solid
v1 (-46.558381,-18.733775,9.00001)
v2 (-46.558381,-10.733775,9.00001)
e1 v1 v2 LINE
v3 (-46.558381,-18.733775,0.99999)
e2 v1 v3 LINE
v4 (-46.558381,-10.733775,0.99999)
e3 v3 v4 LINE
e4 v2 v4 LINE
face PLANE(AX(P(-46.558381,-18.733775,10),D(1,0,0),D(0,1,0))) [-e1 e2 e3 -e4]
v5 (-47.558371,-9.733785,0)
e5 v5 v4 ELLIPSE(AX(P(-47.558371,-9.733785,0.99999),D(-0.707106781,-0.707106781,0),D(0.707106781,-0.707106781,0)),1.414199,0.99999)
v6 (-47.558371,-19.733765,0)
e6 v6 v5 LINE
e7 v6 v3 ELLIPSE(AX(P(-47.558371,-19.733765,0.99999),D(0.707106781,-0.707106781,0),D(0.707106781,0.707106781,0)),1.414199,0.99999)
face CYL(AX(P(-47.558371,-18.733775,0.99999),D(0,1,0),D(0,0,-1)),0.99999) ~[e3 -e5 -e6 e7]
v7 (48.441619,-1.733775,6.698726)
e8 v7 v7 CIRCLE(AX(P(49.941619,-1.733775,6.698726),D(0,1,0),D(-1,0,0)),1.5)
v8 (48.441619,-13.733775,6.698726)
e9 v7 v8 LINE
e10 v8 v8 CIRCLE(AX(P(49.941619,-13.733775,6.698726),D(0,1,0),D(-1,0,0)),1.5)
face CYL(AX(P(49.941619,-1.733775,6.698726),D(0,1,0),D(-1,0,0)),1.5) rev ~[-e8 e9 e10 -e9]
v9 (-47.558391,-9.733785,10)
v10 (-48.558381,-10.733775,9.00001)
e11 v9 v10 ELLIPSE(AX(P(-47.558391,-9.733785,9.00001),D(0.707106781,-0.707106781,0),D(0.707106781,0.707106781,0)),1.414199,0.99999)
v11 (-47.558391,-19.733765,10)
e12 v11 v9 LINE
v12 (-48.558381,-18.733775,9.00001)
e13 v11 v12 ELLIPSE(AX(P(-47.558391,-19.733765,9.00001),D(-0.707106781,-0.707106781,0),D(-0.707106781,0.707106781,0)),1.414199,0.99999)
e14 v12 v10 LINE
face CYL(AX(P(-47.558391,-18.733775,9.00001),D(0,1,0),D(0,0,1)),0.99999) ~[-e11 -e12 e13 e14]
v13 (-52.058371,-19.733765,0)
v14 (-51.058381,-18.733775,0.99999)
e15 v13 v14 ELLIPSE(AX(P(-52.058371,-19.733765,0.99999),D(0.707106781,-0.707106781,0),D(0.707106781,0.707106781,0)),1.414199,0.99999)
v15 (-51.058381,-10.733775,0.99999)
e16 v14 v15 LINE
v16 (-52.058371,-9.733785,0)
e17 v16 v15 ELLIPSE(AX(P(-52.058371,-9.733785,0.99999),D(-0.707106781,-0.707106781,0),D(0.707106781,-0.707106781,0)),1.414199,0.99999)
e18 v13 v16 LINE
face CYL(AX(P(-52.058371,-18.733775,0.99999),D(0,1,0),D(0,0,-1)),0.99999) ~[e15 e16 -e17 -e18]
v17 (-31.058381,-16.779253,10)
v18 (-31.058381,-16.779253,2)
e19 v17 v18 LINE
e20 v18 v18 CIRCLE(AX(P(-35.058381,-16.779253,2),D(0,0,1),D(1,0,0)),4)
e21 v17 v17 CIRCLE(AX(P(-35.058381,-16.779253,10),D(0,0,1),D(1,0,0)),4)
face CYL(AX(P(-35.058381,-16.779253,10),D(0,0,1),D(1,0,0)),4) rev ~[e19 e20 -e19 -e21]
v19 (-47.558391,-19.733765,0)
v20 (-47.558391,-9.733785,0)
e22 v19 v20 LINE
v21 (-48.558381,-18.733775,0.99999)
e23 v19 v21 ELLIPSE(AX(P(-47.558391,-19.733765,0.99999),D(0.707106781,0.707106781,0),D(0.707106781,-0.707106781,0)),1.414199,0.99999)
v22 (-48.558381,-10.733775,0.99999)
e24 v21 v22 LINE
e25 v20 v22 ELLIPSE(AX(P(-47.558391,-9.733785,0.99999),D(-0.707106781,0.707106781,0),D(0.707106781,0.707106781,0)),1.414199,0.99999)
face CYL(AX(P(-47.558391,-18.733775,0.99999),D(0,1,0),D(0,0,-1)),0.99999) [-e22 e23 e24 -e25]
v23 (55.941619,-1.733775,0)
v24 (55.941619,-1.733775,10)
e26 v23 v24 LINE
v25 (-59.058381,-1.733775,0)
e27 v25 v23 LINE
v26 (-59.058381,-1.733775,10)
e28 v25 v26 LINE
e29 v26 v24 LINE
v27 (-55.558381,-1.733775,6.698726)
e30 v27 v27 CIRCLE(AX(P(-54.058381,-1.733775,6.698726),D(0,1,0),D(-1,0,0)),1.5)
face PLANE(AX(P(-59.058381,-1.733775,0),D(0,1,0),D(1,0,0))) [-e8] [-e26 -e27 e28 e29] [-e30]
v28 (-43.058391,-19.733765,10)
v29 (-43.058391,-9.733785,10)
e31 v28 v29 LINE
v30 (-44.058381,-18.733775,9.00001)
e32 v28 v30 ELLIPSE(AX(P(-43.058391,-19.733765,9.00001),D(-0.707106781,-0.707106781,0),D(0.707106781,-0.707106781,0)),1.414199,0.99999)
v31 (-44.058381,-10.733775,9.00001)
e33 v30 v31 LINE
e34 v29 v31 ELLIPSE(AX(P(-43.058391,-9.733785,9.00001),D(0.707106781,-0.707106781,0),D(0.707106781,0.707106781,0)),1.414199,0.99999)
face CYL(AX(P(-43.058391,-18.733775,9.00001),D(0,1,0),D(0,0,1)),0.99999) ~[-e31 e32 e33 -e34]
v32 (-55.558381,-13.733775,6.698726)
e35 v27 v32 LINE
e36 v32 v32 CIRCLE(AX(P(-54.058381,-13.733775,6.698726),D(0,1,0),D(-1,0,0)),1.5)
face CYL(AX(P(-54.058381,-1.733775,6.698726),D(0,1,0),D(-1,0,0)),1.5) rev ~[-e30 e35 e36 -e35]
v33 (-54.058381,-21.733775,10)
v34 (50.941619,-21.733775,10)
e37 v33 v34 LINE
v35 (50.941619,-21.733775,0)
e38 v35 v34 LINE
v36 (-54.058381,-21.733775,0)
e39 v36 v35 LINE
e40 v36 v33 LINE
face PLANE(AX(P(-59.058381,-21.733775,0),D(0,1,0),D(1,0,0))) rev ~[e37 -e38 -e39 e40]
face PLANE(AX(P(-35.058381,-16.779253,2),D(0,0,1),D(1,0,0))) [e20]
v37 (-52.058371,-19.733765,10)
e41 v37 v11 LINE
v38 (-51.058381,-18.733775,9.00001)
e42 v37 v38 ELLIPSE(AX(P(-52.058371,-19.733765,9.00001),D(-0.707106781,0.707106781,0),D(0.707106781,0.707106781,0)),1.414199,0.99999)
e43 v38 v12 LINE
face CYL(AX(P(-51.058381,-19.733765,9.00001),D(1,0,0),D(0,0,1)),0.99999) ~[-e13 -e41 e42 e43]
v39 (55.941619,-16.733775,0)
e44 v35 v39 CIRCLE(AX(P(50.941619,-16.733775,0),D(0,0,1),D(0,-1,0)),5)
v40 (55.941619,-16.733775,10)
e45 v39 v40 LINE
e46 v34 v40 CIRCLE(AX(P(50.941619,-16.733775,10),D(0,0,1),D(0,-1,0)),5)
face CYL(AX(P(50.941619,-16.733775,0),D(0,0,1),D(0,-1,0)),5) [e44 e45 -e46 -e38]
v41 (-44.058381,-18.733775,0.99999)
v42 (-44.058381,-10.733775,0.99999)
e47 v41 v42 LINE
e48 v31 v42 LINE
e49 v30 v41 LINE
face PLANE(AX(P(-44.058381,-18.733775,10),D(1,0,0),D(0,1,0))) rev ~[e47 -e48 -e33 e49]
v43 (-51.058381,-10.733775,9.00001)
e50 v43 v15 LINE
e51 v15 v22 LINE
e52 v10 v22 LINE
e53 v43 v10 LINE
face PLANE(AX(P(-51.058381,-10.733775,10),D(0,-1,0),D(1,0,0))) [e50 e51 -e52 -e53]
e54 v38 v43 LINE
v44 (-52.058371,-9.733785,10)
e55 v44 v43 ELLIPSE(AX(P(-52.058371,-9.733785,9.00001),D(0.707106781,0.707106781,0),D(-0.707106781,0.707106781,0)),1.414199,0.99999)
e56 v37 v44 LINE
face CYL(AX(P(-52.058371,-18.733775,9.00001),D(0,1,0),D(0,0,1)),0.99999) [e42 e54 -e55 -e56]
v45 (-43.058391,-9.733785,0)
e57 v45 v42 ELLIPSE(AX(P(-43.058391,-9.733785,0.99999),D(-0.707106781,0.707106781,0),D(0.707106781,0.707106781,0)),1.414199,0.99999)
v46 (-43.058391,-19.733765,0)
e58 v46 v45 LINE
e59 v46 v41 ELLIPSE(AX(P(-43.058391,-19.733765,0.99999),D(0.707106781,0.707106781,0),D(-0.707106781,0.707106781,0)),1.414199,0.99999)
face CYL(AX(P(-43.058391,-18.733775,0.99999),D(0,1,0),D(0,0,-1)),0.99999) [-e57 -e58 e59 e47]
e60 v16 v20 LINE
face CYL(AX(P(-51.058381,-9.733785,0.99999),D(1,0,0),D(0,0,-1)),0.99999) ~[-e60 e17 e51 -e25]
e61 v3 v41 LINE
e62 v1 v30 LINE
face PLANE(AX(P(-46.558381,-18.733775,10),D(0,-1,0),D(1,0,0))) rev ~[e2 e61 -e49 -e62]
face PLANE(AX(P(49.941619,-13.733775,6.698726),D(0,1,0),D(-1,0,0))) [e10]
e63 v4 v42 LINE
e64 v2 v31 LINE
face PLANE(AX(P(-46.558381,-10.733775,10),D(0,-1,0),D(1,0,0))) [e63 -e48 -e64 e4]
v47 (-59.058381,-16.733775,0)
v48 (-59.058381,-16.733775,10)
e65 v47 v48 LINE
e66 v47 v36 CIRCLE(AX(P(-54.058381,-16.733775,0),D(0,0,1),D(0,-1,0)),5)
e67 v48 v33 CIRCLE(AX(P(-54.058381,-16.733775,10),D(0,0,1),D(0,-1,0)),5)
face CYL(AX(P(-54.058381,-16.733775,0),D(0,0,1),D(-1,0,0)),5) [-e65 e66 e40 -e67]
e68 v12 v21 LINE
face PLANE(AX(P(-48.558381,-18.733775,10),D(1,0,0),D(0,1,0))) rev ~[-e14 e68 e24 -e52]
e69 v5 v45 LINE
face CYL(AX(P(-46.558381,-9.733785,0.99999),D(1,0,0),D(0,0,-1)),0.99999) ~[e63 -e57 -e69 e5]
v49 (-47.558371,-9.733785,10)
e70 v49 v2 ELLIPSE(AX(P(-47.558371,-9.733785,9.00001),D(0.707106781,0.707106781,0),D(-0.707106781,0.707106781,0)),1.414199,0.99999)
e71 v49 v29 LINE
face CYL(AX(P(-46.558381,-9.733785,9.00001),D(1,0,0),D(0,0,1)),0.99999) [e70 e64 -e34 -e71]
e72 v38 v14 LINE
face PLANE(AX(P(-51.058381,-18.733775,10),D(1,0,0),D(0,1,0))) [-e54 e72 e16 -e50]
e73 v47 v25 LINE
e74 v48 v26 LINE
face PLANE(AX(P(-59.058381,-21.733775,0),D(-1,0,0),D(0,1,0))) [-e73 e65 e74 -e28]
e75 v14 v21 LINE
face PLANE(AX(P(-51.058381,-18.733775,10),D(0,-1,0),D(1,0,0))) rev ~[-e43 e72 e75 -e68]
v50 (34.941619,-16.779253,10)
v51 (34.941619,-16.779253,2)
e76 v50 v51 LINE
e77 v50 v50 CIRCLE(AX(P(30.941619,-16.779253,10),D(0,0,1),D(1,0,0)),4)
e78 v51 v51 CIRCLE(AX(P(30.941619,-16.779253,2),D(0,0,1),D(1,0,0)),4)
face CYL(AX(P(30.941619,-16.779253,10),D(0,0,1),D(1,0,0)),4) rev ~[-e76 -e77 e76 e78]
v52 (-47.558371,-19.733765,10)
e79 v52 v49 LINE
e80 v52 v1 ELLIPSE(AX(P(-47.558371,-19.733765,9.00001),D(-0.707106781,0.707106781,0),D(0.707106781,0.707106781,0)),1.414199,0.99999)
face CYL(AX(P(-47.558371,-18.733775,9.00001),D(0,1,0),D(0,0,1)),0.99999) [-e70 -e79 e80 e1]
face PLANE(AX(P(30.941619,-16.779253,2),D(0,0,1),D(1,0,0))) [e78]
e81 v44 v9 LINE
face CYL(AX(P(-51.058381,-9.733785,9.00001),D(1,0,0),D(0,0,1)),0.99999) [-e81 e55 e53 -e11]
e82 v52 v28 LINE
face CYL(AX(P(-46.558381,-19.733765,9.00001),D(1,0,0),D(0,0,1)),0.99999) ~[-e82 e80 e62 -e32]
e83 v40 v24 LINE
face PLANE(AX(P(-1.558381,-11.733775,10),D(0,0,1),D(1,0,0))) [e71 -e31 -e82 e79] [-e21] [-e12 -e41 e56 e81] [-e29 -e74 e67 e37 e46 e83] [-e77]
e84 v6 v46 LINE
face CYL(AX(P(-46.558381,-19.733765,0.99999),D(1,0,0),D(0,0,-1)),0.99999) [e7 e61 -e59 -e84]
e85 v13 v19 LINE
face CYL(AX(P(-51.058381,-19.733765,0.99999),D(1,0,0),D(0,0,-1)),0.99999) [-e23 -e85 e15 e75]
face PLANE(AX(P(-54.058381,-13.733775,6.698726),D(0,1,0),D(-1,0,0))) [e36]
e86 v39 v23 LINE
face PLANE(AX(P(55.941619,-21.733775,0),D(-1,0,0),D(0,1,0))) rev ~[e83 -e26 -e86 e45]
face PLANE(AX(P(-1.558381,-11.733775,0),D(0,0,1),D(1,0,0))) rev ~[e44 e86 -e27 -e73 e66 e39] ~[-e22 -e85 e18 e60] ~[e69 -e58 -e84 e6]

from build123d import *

# Parameters (mm, degrees)
F0_W     = 115
F0_H     = 20
F1_DEPTH = 10
F2_R     = 4
F3_DEPTH = 8
F4_R     = 1.5
F5_DEPTH = 12
F6_R     = 5
F7_W     = 2.5
F7_H     = 8
F8_DEPTH = 25
F9_R     = 0.99999


# Not quite as in the source:
# - a fillet or chamfer is up to 0.001 mm smaller than in the source, because OpenCascade refuses the exact size


with BuildPart() as f1:
    # F0 (on Top) → F1 (new body)
    with BuildSketch(Plane.XY):
        with Locations((-1.558380723, -11.7337754572)):
            Rectangle(F0_W, F0_H)
    extrude(amount=F1_DEPTH)

    # F2 (on face) → F3 (cut)
    with BuildSketch(Plane.XY.offset(10)):
        with Locations((-35.058380723, -16.7792532593)):
            Circle(F2_R)
        with Locations((30.941619277, -16.7792532593)):
            Circle(F2_R)
    extrude(amount=-F3_DEPTH, mode=Mode.SUBTRACT)

    # F4 (on face) → F5 (cut)
    with BuildSketch(Plane(origin=(0, -1.7337754572, 0), x_dir=(-1, 0, 0), z_dir=(0, 1, 0))):
        with Locations((54.058380723, 6.6987262902)):
            Circle(F4_R)
        with Locations((-49.941619277, 6.6987262902)):
            Circle(F4_R)
    extrude(amount=-F5_DEPTH, mode=Mode.SUBTRACT)

    # F6
    f6_edges = [f1.edges().sort_by_distance(p)[0] for p in [
        (-59.058381, -21.733775, 5),
        (55.941619, -21.733775, 5),
    ]]
    fillet(f6_edges, radius=F6_R)

    # F7 (on face) → F8 (cut)
    with BuildSketch(Plane.XY.offset(10)):
        with Locations((-49.808380723, -14.7337754572)):
            Rectangle(F7_W, F7_H)
        with Locations((-45.308380723, -14.7337754572)):
            Rectangle(F7_W, F7_H)
    extrude(amount=-F8_DEPTH, mode=Mode.SUBTRACT)

    # F9 (radius 1 in the source; OpenCascade refuses exactly that, so slightly less here)
    f9_edges = [f1.edges().sort_by_distance(p)[0] for p in [
        (-51.058381, -14.733775, 10),
        (-49.808381, -10.733775, 10),
        (-48.558381, -14.733775, 10),
        (-49.808381, -18.733775, 10),
        (-45.308381, -18.733775, 10),
        (-46.558381, -14.733775, 10),
        (-45.308381, -10.733775, 10),
        (-44.058381, -14.733775, 10),
        (-44.058381, -14.733775, 0),
        (-45.308381, -10.733775, 0),
        (-46.558381, -14.733775, 0),
        (-45.308381, -18.733775, 0),
        (-49.808381, -18.733775, 0),
        (-48.558381, -14.733775, 0),
        (-49.808381, -10.733775, 0),
        (-51.058381, -14.733775, 0),
    ]]
    fillet(f9_edges, radius=F9_R)


solid = f1.part
